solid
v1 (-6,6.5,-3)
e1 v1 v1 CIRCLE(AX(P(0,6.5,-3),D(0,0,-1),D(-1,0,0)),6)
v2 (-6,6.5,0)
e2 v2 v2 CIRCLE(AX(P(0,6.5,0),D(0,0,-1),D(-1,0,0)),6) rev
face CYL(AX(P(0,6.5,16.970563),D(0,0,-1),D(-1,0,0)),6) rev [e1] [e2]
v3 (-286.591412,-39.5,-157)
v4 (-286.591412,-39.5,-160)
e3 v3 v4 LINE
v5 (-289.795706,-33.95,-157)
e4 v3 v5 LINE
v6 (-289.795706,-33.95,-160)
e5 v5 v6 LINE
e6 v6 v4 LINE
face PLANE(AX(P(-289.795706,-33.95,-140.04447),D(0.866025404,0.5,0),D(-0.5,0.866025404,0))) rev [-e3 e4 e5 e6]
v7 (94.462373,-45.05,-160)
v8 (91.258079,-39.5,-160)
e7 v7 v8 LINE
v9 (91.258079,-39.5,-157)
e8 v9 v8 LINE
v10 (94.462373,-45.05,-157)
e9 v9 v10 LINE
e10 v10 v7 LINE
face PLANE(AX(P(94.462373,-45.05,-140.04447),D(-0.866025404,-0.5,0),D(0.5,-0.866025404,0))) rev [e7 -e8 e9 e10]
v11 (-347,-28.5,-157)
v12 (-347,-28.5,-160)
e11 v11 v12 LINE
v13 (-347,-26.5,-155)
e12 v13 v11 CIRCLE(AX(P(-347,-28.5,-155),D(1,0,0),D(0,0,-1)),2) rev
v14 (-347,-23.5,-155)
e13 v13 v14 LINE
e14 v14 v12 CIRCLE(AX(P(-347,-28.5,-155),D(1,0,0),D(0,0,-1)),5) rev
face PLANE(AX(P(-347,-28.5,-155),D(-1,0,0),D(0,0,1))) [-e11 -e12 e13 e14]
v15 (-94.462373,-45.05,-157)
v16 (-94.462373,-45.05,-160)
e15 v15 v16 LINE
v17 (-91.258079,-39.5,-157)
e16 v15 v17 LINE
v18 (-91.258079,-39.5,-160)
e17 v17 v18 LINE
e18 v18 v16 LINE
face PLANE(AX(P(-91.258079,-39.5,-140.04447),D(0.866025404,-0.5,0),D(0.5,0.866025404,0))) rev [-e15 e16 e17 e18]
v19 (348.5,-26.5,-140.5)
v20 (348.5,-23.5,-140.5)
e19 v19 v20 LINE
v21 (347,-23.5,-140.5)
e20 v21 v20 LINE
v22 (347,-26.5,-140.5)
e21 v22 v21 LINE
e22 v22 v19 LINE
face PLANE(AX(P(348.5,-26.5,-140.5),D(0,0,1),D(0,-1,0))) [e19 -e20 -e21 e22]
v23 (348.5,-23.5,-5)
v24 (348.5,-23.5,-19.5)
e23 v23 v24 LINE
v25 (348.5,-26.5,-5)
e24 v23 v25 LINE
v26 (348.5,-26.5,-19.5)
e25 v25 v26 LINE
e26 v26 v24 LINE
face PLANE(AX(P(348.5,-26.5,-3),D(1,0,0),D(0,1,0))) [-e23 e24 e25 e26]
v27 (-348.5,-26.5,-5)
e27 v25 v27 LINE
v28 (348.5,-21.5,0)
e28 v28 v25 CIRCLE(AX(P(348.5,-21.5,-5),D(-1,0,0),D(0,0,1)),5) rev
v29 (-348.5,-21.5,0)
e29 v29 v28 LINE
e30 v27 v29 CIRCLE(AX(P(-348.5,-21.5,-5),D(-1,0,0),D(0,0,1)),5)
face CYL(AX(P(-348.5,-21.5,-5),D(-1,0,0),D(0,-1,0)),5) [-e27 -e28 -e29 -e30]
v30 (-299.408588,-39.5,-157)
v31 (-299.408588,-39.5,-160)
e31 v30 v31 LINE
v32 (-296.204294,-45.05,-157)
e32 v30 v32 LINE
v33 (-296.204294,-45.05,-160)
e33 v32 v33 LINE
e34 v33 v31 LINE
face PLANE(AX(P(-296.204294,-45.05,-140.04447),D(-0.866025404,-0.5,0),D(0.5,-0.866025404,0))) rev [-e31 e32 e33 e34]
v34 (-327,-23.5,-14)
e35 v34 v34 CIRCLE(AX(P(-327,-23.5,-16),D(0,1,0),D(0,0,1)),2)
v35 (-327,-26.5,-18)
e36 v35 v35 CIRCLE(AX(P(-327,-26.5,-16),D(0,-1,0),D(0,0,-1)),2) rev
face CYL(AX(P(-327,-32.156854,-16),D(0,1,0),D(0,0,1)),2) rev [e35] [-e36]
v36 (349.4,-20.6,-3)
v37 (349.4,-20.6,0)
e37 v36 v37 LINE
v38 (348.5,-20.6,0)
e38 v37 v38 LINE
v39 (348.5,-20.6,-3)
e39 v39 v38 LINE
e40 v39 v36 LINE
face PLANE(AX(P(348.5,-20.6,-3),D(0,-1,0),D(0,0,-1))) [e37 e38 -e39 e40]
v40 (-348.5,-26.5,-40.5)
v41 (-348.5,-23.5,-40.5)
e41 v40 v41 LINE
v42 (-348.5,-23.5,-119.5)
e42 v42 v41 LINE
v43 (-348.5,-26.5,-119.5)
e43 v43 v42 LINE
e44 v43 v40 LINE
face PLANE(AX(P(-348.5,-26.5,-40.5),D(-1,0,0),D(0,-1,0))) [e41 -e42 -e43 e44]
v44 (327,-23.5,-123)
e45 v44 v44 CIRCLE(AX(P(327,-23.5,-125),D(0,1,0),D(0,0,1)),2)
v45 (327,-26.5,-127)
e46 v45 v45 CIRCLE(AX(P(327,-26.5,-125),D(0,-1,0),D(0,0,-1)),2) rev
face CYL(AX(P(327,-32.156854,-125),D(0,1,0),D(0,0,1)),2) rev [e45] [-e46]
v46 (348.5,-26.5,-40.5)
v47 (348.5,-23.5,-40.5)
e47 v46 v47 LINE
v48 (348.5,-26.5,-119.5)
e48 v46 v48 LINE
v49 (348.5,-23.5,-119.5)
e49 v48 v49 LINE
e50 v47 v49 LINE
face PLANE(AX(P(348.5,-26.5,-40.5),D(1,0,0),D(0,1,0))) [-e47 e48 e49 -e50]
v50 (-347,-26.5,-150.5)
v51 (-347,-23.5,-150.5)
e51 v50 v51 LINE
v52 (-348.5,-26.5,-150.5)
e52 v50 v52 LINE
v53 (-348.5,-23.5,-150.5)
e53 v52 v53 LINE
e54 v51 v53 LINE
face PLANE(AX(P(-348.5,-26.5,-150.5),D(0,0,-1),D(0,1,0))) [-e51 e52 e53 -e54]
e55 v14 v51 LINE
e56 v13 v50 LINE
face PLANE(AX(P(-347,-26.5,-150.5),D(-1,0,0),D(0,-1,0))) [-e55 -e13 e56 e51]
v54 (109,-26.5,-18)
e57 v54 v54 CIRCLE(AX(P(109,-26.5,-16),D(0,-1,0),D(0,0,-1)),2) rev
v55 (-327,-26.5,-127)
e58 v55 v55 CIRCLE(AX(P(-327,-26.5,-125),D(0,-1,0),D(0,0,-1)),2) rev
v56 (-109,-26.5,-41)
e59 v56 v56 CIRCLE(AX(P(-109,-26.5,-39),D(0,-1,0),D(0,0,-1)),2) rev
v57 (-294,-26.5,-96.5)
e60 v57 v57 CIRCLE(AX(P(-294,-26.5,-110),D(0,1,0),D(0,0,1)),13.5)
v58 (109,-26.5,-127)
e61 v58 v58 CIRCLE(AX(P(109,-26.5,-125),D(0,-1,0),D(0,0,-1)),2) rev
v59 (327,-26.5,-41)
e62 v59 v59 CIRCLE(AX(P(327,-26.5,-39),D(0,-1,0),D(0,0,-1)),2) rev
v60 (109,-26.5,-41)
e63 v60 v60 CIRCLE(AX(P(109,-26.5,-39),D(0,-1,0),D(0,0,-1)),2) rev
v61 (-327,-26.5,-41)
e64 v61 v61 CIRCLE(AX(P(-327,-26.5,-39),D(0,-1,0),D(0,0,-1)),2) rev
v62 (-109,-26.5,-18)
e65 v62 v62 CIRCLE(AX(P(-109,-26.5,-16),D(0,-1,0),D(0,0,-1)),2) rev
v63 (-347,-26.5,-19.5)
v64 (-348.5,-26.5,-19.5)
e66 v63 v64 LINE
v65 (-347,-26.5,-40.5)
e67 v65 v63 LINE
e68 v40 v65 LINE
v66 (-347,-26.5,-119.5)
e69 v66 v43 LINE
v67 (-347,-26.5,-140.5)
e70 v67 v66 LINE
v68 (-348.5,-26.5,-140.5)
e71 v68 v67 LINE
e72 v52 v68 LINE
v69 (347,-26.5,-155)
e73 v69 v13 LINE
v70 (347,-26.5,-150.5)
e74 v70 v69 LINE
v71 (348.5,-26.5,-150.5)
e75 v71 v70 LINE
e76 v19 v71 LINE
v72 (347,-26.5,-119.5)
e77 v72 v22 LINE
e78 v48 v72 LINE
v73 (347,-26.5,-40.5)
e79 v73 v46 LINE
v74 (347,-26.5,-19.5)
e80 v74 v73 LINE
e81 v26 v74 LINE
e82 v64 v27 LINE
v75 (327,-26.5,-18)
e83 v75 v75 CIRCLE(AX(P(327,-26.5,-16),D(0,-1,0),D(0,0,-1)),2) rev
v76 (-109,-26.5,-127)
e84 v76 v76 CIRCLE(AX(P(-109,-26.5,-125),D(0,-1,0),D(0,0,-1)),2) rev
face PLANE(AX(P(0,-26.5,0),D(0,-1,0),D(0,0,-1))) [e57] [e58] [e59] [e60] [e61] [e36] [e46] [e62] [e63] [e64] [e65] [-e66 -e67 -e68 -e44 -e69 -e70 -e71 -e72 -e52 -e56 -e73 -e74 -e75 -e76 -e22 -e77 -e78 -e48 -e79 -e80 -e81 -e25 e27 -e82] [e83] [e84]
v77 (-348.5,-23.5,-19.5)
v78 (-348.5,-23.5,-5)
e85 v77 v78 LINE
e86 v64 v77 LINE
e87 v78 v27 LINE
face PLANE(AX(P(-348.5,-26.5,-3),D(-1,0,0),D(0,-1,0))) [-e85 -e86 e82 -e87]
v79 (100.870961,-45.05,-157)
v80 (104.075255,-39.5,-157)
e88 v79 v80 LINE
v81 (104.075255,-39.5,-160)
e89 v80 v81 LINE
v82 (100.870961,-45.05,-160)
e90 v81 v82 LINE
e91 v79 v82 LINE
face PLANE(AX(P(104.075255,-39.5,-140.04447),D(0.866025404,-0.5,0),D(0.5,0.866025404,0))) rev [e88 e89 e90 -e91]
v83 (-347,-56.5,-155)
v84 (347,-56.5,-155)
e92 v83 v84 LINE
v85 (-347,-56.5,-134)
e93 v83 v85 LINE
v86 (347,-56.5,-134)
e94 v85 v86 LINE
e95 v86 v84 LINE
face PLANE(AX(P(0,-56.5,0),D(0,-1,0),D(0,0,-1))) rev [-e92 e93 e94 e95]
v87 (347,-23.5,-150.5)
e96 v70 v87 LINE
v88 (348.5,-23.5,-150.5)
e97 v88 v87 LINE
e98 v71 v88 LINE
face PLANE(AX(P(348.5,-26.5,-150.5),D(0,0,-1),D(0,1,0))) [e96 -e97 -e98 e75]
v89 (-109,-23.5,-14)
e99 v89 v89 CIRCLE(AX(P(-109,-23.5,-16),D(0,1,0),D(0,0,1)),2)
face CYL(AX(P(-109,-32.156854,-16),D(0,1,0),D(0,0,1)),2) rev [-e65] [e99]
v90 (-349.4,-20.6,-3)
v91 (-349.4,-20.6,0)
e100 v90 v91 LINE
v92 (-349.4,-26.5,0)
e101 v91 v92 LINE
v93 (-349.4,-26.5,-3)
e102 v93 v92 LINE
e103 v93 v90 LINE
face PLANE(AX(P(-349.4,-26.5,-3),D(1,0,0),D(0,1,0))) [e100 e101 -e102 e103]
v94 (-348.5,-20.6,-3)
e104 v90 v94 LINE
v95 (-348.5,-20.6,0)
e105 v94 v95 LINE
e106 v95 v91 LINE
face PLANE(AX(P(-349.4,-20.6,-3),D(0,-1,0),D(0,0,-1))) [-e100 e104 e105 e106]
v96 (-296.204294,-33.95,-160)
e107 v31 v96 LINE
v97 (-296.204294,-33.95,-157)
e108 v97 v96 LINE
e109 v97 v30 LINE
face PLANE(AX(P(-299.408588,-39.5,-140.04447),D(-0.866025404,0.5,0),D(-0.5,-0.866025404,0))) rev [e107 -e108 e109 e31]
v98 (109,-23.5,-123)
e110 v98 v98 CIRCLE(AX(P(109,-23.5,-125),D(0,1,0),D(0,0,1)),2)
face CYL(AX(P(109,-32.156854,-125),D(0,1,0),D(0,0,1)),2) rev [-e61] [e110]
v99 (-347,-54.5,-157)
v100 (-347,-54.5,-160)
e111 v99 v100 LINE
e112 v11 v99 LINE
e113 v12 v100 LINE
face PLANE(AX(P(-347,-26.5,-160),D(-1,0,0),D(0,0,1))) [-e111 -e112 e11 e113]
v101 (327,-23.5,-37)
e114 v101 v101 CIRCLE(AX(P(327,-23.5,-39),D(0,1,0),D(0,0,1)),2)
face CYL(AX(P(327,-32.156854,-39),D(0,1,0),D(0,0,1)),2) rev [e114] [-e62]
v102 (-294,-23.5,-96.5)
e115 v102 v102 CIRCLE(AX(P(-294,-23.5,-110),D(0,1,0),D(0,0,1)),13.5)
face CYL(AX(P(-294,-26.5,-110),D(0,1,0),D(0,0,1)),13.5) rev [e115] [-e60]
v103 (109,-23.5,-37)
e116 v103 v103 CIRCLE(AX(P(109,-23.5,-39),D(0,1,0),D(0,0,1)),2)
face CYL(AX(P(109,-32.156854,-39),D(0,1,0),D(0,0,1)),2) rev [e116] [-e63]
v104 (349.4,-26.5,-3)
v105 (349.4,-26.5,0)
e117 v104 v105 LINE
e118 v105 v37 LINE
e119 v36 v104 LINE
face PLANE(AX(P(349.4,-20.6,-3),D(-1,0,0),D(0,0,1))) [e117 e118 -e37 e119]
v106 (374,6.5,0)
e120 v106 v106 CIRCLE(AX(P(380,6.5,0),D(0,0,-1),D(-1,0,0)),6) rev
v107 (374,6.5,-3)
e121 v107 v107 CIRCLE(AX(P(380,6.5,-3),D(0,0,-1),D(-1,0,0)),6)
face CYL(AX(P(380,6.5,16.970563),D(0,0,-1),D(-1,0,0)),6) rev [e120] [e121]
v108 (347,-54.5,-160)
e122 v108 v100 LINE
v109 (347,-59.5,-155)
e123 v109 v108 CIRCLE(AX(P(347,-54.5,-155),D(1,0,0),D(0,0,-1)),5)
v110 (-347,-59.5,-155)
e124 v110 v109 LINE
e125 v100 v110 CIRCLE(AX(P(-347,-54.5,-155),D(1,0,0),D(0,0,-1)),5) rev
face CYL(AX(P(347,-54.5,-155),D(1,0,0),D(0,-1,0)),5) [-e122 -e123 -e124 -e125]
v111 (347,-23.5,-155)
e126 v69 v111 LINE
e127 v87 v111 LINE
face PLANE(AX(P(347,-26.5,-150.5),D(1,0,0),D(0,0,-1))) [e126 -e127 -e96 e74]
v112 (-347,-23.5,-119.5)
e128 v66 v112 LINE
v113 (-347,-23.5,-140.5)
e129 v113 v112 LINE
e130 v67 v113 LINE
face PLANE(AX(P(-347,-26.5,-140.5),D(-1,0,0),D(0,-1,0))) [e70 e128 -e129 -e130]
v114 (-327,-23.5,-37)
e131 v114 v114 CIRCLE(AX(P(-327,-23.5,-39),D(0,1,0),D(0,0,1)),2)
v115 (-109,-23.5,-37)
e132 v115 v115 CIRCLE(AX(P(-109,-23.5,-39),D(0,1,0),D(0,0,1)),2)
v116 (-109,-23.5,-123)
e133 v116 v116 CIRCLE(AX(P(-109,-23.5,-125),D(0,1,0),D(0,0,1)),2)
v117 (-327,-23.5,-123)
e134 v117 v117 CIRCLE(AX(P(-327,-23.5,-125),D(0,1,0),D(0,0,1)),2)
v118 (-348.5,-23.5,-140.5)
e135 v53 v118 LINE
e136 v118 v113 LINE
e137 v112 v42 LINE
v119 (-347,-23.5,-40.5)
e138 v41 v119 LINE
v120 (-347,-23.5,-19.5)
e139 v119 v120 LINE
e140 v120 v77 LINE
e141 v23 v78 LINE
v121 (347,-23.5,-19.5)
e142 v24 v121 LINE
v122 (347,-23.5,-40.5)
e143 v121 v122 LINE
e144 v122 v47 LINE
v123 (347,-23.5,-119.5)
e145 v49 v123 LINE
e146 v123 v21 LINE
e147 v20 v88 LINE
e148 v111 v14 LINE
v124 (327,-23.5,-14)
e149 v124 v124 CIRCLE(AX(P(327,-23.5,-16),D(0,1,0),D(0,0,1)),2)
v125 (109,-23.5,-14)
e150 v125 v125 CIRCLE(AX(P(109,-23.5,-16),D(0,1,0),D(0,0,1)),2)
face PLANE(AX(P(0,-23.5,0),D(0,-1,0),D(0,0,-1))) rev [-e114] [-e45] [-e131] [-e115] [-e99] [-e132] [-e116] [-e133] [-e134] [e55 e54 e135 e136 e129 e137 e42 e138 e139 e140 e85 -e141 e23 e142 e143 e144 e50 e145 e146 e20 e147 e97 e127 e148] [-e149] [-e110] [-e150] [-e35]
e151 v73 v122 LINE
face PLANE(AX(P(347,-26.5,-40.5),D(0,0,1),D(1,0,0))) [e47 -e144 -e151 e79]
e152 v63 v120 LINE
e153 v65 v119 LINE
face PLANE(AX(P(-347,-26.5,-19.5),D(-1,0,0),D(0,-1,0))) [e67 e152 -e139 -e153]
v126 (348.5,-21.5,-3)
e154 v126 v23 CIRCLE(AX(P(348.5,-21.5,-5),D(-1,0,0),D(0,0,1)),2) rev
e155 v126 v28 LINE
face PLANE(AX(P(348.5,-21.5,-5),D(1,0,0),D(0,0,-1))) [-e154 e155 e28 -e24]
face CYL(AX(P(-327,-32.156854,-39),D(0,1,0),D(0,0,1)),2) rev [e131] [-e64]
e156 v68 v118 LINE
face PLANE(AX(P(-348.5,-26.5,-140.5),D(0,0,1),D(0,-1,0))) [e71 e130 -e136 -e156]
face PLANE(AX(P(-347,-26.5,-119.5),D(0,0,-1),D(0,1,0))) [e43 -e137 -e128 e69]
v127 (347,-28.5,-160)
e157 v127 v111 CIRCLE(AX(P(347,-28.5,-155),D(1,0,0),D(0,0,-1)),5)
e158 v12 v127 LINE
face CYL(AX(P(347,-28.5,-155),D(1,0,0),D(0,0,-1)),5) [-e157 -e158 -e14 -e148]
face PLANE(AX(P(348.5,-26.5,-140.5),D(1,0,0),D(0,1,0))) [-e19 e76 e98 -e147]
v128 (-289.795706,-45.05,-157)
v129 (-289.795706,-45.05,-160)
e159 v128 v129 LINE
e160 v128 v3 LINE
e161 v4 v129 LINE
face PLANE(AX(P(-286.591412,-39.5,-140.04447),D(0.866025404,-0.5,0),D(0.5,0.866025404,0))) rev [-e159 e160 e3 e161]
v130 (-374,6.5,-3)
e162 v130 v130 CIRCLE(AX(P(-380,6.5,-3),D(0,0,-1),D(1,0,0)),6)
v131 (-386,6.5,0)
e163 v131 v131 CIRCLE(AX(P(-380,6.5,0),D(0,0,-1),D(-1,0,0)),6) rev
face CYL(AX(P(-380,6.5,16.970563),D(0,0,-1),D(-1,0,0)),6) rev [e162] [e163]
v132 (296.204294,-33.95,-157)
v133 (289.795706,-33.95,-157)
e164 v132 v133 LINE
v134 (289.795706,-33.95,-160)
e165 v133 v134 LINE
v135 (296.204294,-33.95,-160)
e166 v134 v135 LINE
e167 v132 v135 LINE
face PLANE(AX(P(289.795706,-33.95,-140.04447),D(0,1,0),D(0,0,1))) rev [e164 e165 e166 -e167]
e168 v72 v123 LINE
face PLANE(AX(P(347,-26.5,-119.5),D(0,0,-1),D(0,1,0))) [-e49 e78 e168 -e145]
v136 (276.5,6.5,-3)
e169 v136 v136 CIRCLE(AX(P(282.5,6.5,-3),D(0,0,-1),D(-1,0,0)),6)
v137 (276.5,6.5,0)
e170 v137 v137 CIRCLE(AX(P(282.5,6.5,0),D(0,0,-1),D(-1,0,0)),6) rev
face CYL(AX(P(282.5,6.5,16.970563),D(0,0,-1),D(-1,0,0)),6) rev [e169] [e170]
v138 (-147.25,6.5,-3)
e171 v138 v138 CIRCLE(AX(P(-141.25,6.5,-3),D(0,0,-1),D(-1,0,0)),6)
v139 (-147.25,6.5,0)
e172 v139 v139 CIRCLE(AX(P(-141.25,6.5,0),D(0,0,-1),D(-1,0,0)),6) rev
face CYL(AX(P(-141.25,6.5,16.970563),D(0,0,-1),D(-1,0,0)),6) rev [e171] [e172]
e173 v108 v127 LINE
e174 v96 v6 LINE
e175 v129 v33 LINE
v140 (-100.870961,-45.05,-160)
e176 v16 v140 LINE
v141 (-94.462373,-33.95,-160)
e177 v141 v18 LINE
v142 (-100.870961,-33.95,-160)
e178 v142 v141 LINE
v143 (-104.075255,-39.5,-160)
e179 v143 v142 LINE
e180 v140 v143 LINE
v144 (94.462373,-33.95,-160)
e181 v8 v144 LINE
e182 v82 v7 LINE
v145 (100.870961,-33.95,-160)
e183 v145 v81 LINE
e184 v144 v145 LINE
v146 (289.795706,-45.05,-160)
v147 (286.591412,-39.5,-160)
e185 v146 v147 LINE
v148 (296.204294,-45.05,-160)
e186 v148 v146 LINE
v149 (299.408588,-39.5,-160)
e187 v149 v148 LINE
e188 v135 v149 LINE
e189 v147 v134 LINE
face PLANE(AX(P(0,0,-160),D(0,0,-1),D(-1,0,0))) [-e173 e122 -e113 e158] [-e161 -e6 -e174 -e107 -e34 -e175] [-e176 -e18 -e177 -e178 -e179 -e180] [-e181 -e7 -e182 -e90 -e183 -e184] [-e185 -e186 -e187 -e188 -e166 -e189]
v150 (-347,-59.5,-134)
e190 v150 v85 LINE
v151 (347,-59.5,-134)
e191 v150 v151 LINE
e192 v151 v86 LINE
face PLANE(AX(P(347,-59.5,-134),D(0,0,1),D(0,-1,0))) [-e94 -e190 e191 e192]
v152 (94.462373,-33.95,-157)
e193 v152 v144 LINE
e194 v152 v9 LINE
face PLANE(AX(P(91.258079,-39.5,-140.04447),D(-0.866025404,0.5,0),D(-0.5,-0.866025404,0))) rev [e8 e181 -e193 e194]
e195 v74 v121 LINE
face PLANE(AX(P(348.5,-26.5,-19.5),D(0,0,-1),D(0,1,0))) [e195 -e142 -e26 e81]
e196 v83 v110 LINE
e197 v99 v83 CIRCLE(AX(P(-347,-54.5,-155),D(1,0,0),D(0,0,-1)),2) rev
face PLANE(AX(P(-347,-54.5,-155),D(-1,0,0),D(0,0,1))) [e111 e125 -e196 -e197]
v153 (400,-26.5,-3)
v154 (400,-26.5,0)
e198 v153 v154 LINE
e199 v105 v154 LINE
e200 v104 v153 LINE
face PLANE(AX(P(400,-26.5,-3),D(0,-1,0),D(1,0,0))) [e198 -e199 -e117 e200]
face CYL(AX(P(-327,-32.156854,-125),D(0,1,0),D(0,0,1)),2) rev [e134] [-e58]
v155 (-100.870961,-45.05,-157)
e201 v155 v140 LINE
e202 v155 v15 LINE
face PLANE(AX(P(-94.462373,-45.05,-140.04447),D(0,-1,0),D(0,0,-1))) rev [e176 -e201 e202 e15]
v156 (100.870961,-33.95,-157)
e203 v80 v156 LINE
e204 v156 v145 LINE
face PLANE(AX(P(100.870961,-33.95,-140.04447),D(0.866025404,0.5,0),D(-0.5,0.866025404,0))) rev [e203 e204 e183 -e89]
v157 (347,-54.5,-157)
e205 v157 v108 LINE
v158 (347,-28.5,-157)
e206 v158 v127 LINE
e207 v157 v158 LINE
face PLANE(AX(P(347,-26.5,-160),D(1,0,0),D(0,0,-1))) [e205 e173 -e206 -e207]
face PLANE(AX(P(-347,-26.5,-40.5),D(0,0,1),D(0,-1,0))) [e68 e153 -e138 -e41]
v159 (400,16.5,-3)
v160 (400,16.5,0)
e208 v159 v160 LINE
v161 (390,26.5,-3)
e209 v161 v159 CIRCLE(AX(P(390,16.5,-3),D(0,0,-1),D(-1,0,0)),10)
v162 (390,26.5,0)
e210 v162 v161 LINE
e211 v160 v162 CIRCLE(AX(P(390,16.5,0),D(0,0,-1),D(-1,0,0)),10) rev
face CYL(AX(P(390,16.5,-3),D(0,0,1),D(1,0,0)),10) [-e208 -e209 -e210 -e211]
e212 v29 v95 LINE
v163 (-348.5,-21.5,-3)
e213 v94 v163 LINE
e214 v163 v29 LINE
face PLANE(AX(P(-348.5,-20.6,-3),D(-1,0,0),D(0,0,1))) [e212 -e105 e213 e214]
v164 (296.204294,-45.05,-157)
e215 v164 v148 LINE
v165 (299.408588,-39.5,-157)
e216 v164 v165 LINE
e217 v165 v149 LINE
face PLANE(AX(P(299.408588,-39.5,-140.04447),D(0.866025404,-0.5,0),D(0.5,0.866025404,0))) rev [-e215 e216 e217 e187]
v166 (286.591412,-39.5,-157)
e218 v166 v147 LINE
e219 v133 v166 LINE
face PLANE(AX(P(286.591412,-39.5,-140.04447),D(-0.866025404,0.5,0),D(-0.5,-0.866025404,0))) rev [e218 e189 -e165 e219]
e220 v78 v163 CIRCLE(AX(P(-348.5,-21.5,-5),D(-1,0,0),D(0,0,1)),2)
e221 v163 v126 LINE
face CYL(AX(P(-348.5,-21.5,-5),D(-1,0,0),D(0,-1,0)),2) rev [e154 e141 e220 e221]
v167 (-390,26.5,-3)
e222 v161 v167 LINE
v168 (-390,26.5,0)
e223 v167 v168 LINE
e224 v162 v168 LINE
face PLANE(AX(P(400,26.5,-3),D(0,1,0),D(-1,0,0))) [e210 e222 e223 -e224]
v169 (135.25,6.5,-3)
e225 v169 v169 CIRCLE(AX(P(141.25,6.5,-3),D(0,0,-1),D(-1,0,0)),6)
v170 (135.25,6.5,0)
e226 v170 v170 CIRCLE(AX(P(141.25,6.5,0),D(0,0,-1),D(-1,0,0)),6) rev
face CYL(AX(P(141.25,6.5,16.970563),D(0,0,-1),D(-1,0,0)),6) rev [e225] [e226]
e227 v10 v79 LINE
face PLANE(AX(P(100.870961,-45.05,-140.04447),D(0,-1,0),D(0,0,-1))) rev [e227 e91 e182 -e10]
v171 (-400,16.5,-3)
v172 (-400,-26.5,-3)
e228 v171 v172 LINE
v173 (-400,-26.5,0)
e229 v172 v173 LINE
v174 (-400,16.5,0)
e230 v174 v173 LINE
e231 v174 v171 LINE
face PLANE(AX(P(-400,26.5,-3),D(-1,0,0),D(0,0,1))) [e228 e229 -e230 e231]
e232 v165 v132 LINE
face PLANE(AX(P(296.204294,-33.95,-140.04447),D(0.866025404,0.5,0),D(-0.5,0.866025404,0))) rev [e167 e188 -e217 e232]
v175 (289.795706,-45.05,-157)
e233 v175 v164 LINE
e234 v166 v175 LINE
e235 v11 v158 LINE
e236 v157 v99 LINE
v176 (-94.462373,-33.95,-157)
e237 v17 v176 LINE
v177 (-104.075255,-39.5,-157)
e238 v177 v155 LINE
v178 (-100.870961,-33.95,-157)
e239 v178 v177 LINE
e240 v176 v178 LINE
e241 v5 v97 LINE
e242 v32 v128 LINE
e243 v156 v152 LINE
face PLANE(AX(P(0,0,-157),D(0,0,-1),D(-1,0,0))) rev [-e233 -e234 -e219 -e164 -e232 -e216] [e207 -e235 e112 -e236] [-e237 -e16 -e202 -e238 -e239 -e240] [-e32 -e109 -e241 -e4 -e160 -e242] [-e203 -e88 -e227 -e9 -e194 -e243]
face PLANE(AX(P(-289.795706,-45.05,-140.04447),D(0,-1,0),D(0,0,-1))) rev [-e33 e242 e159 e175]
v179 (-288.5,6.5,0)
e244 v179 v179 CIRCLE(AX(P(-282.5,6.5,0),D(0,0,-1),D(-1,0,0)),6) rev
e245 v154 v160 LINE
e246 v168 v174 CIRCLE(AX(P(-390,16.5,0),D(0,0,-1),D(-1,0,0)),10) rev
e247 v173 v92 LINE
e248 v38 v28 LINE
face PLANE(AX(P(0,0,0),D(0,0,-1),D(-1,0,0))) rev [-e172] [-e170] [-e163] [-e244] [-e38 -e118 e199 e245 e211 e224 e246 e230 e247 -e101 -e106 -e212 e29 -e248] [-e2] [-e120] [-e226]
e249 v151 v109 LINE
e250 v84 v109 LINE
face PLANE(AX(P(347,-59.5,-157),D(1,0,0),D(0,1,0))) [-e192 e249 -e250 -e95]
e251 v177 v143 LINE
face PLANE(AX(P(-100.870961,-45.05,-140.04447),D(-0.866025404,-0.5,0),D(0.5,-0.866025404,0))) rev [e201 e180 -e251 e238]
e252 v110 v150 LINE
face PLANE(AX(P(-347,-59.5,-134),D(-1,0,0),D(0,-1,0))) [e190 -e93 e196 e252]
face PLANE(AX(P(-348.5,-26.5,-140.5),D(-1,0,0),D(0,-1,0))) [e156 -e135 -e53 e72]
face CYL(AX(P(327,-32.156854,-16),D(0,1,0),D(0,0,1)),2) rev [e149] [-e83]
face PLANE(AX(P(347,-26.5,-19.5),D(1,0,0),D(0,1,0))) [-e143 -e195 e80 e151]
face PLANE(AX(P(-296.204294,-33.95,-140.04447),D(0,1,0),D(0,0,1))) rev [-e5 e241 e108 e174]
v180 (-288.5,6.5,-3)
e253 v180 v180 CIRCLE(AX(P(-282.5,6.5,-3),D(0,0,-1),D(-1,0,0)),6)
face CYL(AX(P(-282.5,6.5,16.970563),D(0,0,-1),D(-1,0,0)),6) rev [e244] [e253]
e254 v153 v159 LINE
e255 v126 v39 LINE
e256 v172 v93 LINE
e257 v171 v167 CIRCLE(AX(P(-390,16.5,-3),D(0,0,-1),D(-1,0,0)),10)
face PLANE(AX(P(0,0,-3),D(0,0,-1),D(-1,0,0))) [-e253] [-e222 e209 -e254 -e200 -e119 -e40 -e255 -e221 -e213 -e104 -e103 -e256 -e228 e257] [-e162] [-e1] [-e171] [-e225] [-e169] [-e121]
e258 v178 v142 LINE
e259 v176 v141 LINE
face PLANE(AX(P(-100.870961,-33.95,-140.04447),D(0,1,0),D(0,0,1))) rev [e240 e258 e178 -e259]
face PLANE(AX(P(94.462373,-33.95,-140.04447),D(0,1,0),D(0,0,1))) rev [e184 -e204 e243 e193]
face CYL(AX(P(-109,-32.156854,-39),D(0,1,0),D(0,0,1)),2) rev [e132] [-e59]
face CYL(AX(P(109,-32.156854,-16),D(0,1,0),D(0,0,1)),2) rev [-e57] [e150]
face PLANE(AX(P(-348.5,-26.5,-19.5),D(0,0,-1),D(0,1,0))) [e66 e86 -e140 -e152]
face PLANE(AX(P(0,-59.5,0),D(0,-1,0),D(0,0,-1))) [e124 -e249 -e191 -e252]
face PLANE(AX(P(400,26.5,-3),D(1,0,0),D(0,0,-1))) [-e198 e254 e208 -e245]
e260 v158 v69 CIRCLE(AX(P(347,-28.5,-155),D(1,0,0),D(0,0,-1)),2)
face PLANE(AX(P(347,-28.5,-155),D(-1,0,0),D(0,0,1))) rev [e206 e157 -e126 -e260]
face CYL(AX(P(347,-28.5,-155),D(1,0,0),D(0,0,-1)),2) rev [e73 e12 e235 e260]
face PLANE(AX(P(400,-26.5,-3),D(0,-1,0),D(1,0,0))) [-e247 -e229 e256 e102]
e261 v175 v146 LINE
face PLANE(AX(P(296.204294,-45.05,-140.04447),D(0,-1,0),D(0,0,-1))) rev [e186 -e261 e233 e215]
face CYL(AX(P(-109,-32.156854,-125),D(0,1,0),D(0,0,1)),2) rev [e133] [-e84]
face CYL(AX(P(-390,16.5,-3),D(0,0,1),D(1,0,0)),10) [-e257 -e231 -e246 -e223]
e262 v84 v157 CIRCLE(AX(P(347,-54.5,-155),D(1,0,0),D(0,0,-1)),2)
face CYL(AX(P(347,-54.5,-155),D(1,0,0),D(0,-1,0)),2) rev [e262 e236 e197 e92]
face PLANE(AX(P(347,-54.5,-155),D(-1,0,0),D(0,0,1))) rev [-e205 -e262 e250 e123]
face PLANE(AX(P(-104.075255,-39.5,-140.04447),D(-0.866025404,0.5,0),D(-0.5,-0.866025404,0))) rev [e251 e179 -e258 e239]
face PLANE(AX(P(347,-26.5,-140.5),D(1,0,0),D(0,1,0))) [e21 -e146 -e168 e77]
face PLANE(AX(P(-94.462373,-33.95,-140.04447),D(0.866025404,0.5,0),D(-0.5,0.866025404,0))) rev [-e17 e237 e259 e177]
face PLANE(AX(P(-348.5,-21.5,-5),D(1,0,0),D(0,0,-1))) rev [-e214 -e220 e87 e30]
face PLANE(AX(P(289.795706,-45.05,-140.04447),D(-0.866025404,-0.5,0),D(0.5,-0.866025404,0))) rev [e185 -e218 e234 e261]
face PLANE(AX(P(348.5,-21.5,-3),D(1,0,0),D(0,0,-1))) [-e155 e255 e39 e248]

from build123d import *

# Parameters (mm, degrees)
SKETCH2_W                     = 800
SKETCH2_H                     = 53
BASE_FLANGE1_DEPTH            = 3
EDGE_FLANGE1_STRIP_W          = 16
EDGE_FLANGE1_STRIP_H          = 3
EDGE_FLANGE1_STRIP_CUT_DEPTH  = 697
EDGE_FLANGE1_RELIEF_W         = 16.9
EDGE_FLANGE1_RELIEF_H         = 0.9
EDGE_FLANGE1_RELIEF_CUT_DEPTH = 3
EDGE_FLANGE1_DEPTH            = 697
EDGE_FLANGE1_FLAT_DEPTH       = 3
EDGE_FLANGE2_STRIP_W          = 16
EDGE_FLANGE2_STRIP_H          = 3
EDGE_FLANGE2_STRIP_CUT_DEPTH  = 694
EDGE_FLANGE2_DEPTH            = 694
EDGE_FLANGE3_STRIP_W          = 16
EDGE_FLANGE3_STRIP_H          = 3
EDGE_FLANGE3_STRIP_CUT_DEPTH  = 694
EDGE_FLANGE3_DEPTH            = 694
FILLET1_R                     = 10
CUT_EXTRUDE2_DEPTH            = 3
LPATTERN1_COUNT               = 4
LPATTERN1_PITCH               = 195.333333333
SKETCH20_R                    = 6
CUT_EXTRUDE3_DEPTH            = 3
SKETCH21_R                    = 6
CUT_EXTRUDE4_DEPTH            = 3
LPATTERN2_COUNT               = 5
LPATTERN2_PITCH               = 141.25
SKETCH22_R                    = 2
CUT_EXTRUDE5_DEPTH            = 3
LPATTERN3_COUNT               = 4
LPATTERN3_PITCH               = 218
SKETCH23_R                    = 13.5
CUT_EXTRUDE6_DEPTH            = 10


# Sheet-metal steps are written as plain solids
with BuildPart() as part:
    # Sketch2 → Base-Flange1 (new body)
    with BuildSketch(Plane.XY):
        Rectangle(SKETCH2_W, SKETCH2_H)
    extrude(amount=-BASE_FLANGE1_DEPTH)

    # Edge-Flange1 strip (across the edge) → Edge-Flange1 strip cut (cut)
    with BuildSketch(Plane(origin=(348.5, -26.5, -3), x_dir=(0, 1, 0), z_dir=(-1, 0, 0))):
        with Locations((-3, -1.5)):
            Rectangle(EDGE_FLANGE1_STRIP_W, EDGE_FLANGE1_STRIP_H)
    extrude(amount=EDGE_FLANGE1_STRIP_CUT_DEPTH, mode=Mode.SUBTRACT)

    # Edge-Flange1 relief (on the sheet) → Edge-Flange1 relief cut (cut)
    with BuildSketch(Plane(origin=(348.5, -21.5, -3), x_dir=(0, 1, 0), z_dir=(0, 0, -1))):
        with Locations((-7.55, 0.45)):
            Rectangle(EDGE_FLANGE1_RELIEF_W, EDGE_FLANGE1_RELIEF_H)
        with Locations((-7.55, -697.45)):
            Rectangle(EDGE_FLANGE1_RELIEF_W, EDGE_FLANGE1_RELIEF_H)
    extrude(amount=-EDGE_FLANGE1_RELIEF_CUT_DEPTH, mode=Mode.SUBTRACT)

    # Edge-Flange1 bend section (across the edge) → Edge-Flange1 (add)
    with BuildSketch(Plane(origin=(348.5, -26.5, -3), x_dir=(0, 1, 0), z_dir=(-1, 0, 0))):
        with BuildLine():
            Line((0, 2), (3, 2))
            ThreePointArc((3, 2), (3.585786438, 0.585786438), (5, 0))
            Line((5, 0), (5, -3))
            ThreePointArc((5, -3), (1.464466094, -1.535533906), (0, 2))
        make_face()
    extrude(amount=EDGE_FLANGE1_DEPTH)

    # Edge-Flange1 profile (on flange) → Edge-Flange1 flat (add)
    with BuildSketch(Plane(origin=(0, -26.5, -3), x_dir=(1, 0, 0), z_dir=(0, 1, 0))):
        Polygon((-348.5, 16.5), (-348.5, 2), (348.5, 2), (348.5, 16.5), (347, 16.5), (347, 37.5), (348.5, 37.5), (348.5, 116.5), (347, 116.5), (347, 137.5), (348.5, 137.5), (348.5, 147.5), (347, 147.5), (347, 157), (-347, 157), (-347, 147.5), (-348.5, 147.5), (-348.5, 137.5), (-347, 137.5), (-347, 116.5), (-348.5, 116.5), (-348.5, 37.5), (-347, 37.5), (-347, 16.5), align=None)
    extrude(amount=EDGE_FLANGE1_FLAT_DEPTH)

    # Edge-Flange2 strip (across the edge) → Edge-Flange2 strip cut (cut)
    with BuildSketch(Plane(origin=(-347, -26.5, -160), x_dir=(0, 0, 1), z_dir=(1, 0, 0))):
        with Locations((-3, -1.5)):
            Rectangle(EDGE_FLANGE2_STRIP_W, EDGE_FLANGE2_STRIP_H)
    extrude(amount=EDGE_FLANGE2_STRIP_CUT_DEPTH, mode=Mode.SUBTRACT)

    # Edge-Flange2 section (across the edge) → Edge-Flange2 (add)
    with BuildSketch(Plane(origin=(-347, -26.5, -160), x_dir=(0, 0, 1), z_dir=(1, 0, 0))):
        with BuildLine():
            Line((0, 2), (0, 33))
            Line((0, 33), (3, 33))
            Line((3, 33), (3, 2))
            ThreePointArc((3, 2), (3.585786438, 0.585786438), (5, 0))
            Line((5, 0), (5, -3))
            ThreePointArc((5, -3), (1.464466094, -1.535533906), (0, 2))
        make_face()
    extrude(amount=EDGE_FLANGE2_DEPTH)

    # Edge-Flange3 strip (across the edge) → Edge-Flange3 strip cut (cut)
    with BuildSketch(Plane(origin=(-347, -59.5, -157), x_dir=(0, 1, 0), z_dir=(1, 0, 0))):
        with Locations((-3, -1.5)):
            Rectangle(EDGE_FLANGE3_STRIP_W, EDGE_FLANGE3_STRIP_H)
    extrude(amount=EDGE_FLANGE3_STRIP_CUT_DEPTH, mode=Mode.SUBTRACT)

    # Edge-Flange3 section (across the edge) → Edge-Flange3 (add)
    with BuildSketch(Plane(origin=(-347, -59.5, -157), x_dir=(0, 1, 0), z_dir=(1, 0, 0))):
        with BuildLine():
            Line((0, 2), (0, 23))
            Line((0, 23), (3, 23))
            Line((3, 23), (3, 2))
            ThreePointArc((3, 2), (3.585786438, 0.585786438), (5, 0))
            Line((5, 0), (5, -3))
            ThreePointArc((5, -3), (1.464466094, -1.535533906), (0, 2))
        make_face()
    extrude(amount=EDGE_FLANGE3_DEPTH)

    # Fillet1
    fillet1_edges = [part.edges().sort_by_distance(p)[0] for p in [
        (-400, 26.5, -1.5),
        (400, 26.5, -1.5),
    ]]
    fillet(fillet1_edges, radius=FILLET1_R)

    # Sketch19 → Cut-Extrude2 (cut)
    with BuildSketch(Plane(origin=(0, 0, -160), x_dir=(-1, 0, 0), z_dir=(0, 0, -1))):
        Polygon((-286.591412012, -39.5), (-289.795706006, -33.95), (-296.204293994, -33.95), (-299.408587988, -39.5), (-296.204293994, -45.05), (-289.795706006, -45.05), align=None)
    cut_extrude2 = extrude(amount=-CUT_EXTRUDE2_DEPTH, mode=Mode.SUBTRACT)

    # LPattern1: Cut-Extrude2 ×4
    with Locations(*[(-i * LPATTERN1_PITCH, 0, 0) for i in range(1, LPATTERN1_COUNT)]):
        add(cut_extrude2, mode=Mode.SUBTRACT)

    # Sketch20 → Cut-Extrude3 (cut)
    with BuildSketch(Plane(origin=(0, 0, -3), x_dir=(-1, 0, 0), z_dir=(0, 0, -1))):
        with Locations((-380, 6.5)):
            Circle(SKETCH20_R)
        with Locations((380, 6.5)):
            Circle(SKETCH20_R)
    extrude(amount=-CUT_EXTRUDE3_DEPTH, mode=Mode.SUBTRACT)

    # Sketch21 → Cut-Extrude4 (cut)
    with BuildSketch(Plane(origin=(0, 0, -3), x_dir=(-1, 0, 0), z_dir=(0, 0, -1))):
        with Locations((-282.5, 6.5)):
            Circle(SKETCH21_R)
    cut_extrude4 = extrude(amount=-CUT_EXTRUDE4_DEPTH, mode=Mode.SUBTRACT)

    # LPattern2: Cut-Extrude4 ×5
    with Locations(*[(-i * LPATTERN2_PITCH, 0, 0) for i in range(1, LPATTERN2_COUNT)]):
        add(cut_extrude4, mode=Mode.SUBTRACT)

    # Sketch22 → Cut-Extrude5 (cut)
    with BuildSketch(Plane(origin=(0, -23.5, 0), x_dir=(1, 0, 0), z_dir=(0, 1, 0))):
        with Locations(Location((-327, 16, 0), (0, 0, 270))):
            Circle(SKETCH22_R)
        with Locations(Location((-327, 39, 0), (0, 0, 270))):
            Circle(SKETCH22_R)
        with Locations(Location((-327, 125, 0), (0, 0, 270))):
            Circle(SKETCH22_R)
    cut_extrude5 = extrude(amount=-CUT_EXTRUDE5_DEPTH, mode=Mode.SUBTRACT)

    # LPattern3: Cut-Extrude5 ×4
    with Locations(*[(i * LPATTERN3_PITCH, 0, 0) for i in range(1, LPATTERN3_COUNT)]):
        add(cut_extrude5, mode=Mode.SUBTRACT)

    # Sketch23 → Cut-Extrude6 (cut)
    with BuildSketch(Plane(origin=(0, -23.5, 0), x_dir=(1, 0, 0), z_dir=(0, 1, 0))):
        with Locations(Location((-294, 110, 0), (0, 0, 270))):
            Circle(SKETCH23_R)
    extrude(amount=-CUT_EXTRUDE6_DEPTH, mode=Mode.SUBTRACT)


solid = part.part
